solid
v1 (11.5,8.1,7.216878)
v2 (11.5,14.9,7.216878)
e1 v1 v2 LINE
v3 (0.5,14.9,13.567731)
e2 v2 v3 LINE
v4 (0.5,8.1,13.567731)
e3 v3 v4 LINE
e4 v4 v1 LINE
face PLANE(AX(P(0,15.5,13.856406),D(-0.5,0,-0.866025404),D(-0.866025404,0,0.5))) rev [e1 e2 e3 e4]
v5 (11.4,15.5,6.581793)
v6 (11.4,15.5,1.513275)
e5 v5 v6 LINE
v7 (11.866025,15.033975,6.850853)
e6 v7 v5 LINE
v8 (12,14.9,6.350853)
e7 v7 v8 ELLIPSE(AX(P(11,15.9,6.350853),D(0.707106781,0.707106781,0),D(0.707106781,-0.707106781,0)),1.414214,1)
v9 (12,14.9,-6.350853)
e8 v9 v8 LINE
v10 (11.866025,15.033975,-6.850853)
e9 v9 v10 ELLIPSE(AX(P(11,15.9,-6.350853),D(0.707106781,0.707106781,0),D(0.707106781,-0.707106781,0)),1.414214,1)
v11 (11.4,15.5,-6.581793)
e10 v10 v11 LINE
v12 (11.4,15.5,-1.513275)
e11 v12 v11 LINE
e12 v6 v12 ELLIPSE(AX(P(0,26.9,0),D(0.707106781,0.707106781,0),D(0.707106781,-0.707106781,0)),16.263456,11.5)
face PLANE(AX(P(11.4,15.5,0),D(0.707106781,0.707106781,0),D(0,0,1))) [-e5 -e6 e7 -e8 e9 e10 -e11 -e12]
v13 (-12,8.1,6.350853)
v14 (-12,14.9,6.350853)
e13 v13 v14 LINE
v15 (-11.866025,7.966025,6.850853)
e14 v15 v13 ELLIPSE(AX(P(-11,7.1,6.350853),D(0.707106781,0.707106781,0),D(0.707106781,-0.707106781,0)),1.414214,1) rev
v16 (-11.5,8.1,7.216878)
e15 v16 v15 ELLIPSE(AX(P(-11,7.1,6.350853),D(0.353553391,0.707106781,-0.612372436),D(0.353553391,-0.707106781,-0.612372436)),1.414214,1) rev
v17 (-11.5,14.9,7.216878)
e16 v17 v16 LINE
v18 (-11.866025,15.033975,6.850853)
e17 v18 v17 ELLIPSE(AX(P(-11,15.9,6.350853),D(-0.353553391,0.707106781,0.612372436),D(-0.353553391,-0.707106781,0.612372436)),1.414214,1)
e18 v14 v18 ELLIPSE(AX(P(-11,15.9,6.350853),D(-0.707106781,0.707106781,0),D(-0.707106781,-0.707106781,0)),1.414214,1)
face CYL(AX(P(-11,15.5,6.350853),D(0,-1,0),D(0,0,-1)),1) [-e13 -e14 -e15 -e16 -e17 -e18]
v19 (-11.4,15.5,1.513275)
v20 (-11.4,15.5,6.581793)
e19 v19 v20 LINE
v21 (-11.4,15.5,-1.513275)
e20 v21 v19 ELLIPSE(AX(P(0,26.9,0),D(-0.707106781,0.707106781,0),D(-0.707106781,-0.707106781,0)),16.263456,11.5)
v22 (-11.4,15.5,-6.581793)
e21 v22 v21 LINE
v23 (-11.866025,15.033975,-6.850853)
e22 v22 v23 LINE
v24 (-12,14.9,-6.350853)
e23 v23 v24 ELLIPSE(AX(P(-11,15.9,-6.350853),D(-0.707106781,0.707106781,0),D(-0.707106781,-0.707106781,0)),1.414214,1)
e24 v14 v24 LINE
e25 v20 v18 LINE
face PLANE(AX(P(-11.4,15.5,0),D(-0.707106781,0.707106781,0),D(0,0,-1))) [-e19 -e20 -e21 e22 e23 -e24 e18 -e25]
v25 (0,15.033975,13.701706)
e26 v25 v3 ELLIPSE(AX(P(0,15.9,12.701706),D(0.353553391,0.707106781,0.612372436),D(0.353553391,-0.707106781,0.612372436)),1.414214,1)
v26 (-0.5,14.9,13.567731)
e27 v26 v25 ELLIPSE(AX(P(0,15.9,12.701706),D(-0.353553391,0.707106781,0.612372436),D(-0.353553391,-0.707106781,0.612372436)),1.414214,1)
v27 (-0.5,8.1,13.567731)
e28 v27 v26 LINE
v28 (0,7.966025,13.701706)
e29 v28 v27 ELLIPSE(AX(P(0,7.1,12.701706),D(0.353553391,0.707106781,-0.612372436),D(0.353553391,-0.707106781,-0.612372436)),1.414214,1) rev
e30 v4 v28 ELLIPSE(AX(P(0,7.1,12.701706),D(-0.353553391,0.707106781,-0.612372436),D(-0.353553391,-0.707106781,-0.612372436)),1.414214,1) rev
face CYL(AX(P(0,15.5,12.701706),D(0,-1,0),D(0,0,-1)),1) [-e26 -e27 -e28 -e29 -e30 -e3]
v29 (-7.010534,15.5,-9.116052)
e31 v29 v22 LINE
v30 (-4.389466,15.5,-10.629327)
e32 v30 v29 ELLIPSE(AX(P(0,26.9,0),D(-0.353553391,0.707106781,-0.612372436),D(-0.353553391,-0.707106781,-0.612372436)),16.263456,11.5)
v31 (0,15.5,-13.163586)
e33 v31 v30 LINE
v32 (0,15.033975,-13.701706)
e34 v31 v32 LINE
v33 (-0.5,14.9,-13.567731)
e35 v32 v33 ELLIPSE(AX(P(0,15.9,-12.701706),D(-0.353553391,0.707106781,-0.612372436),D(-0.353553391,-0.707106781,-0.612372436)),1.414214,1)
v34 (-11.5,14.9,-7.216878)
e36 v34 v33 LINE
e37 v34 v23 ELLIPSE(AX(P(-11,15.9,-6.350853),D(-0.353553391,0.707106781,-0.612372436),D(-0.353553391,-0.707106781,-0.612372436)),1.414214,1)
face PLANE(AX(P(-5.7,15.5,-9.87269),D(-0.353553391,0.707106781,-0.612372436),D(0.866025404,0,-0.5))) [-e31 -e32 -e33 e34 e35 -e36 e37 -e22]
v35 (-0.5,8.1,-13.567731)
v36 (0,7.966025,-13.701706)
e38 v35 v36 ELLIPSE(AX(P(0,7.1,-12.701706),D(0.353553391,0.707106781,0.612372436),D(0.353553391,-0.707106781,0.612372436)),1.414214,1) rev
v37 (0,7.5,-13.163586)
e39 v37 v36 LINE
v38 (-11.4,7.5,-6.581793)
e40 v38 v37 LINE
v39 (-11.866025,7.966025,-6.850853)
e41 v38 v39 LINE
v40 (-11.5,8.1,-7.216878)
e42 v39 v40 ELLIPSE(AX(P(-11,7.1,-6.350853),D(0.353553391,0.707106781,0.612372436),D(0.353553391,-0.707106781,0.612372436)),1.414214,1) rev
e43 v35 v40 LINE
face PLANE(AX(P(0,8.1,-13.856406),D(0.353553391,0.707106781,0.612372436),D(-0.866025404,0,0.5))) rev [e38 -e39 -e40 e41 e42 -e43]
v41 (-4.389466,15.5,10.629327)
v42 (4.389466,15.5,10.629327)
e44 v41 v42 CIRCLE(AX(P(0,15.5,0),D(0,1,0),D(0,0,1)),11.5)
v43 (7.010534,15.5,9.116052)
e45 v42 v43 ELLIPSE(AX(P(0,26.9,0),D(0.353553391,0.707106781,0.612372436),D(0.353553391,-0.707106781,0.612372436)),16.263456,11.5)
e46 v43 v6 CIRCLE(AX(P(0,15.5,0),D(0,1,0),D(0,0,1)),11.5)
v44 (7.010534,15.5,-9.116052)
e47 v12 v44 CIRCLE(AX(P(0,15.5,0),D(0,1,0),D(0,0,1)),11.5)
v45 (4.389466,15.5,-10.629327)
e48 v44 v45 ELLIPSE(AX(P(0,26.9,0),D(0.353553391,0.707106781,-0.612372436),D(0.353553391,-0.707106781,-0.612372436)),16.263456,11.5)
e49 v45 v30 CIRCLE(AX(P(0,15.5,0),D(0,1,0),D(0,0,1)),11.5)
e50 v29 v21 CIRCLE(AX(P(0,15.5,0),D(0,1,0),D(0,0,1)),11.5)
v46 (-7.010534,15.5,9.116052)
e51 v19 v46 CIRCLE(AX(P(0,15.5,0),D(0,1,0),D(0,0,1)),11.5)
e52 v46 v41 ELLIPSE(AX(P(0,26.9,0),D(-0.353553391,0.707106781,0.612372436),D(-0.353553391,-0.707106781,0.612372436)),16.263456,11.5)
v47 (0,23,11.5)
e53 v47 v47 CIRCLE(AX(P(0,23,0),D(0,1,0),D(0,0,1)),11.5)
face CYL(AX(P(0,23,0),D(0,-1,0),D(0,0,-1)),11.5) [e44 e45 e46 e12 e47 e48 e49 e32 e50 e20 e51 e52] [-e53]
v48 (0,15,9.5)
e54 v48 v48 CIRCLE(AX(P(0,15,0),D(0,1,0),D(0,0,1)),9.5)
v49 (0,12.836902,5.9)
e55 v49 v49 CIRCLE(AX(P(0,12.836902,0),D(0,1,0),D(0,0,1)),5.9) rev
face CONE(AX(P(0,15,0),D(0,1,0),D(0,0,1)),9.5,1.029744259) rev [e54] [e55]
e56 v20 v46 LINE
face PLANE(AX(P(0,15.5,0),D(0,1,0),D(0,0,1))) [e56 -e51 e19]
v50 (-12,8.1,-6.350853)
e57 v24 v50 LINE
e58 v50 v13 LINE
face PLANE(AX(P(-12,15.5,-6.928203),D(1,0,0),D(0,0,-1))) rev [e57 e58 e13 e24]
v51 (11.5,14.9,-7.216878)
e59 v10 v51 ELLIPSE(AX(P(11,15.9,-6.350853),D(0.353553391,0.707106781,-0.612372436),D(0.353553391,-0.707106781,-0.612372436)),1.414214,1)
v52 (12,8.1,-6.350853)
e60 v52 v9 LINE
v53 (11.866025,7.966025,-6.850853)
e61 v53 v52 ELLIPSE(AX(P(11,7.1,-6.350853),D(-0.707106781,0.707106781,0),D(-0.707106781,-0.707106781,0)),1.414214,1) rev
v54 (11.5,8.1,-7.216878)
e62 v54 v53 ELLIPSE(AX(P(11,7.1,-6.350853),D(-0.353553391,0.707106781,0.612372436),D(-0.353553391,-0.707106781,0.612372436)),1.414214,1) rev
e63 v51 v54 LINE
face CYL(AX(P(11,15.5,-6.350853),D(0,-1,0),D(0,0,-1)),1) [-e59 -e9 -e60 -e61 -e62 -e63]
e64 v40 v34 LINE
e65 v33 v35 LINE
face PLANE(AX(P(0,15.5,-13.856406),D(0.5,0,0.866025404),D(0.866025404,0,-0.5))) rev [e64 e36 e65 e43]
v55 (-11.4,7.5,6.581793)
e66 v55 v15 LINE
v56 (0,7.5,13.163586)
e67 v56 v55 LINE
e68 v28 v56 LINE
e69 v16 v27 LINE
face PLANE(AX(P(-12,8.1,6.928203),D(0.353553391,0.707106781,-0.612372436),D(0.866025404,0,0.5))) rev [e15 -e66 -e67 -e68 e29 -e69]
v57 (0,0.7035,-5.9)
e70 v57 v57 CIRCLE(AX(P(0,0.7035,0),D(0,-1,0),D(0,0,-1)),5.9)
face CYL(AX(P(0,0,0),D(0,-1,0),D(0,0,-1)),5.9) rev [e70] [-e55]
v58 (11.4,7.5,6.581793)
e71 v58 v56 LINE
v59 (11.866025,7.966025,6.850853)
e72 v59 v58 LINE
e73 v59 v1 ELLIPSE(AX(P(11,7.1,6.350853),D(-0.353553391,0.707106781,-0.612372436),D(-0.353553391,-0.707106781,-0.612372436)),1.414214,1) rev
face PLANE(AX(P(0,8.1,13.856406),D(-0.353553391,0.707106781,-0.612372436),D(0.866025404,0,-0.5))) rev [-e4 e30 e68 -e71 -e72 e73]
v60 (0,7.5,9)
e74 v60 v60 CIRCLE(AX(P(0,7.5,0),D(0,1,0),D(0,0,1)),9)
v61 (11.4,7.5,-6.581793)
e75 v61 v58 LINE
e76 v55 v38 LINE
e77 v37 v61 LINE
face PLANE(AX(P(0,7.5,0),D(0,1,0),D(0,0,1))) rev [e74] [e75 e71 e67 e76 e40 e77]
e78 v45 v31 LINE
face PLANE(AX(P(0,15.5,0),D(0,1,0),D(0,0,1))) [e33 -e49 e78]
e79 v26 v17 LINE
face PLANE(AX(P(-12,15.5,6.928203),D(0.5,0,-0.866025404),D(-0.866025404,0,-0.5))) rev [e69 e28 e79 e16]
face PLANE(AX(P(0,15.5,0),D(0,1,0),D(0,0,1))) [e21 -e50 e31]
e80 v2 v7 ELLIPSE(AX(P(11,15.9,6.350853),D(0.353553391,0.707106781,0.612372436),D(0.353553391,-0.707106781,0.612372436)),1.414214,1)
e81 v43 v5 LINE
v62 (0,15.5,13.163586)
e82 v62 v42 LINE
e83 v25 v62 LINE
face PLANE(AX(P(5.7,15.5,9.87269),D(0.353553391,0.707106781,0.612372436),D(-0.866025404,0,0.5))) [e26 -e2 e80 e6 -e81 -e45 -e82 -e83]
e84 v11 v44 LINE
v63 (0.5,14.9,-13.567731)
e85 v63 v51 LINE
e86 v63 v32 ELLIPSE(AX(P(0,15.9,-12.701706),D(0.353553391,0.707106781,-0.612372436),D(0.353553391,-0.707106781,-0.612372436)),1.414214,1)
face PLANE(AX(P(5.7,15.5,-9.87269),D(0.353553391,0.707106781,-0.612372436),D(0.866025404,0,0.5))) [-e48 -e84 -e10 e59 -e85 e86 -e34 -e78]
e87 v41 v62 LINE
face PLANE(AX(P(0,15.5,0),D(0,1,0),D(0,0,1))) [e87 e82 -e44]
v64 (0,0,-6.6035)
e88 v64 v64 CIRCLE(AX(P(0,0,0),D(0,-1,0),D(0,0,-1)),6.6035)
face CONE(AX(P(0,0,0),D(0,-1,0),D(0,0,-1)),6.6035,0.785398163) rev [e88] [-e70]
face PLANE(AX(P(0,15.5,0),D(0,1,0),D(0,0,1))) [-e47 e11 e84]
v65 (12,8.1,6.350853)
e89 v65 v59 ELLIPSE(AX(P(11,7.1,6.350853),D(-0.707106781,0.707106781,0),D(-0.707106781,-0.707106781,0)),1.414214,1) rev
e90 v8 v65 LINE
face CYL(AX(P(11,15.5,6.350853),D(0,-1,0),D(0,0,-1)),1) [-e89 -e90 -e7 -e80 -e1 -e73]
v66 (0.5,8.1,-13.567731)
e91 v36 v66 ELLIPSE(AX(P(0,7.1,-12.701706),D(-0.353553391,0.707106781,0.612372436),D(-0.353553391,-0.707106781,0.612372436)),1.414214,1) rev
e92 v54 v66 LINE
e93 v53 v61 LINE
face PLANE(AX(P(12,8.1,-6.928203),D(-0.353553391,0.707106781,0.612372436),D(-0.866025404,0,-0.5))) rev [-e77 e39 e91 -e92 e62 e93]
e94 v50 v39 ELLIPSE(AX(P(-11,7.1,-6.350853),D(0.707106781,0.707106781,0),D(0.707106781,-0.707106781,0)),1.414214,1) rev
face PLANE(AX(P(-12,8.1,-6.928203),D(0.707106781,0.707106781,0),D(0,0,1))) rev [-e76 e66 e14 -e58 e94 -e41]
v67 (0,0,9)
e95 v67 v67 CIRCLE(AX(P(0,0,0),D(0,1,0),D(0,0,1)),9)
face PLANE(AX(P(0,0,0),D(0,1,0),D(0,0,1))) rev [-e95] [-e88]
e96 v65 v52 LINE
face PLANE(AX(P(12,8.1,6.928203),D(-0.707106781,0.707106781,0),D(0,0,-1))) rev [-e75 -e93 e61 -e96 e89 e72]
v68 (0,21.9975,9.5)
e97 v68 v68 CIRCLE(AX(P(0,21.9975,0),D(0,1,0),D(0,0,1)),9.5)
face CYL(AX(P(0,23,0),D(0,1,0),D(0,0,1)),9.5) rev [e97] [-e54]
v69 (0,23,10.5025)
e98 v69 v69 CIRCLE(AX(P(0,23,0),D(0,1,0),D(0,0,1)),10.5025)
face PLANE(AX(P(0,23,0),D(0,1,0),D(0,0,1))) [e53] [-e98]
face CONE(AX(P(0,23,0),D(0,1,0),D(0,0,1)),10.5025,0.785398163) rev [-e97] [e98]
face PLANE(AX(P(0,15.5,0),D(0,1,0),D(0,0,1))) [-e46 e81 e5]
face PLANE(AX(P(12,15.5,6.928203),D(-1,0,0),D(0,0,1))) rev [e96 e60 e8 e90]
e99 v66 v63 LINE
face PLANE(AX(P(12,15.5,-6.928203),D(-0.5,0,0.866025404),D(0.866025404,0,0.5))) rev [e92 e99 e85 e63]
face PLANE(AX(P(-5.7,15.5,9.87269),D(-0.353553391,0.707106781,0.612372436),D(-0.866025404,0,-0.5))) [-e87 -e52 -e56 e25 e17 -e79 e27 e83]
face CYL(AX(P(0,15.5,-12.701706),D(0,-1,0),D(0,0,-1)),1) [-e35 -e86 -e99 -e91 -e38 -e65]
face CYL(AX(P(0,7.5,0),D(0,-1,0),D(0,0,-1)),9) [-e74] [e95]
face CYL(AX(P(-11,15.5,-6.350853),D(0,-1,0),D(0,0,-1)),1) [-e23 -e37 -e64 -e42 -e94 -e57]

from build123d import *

# Parameters (mm, degrees)
SKETCH_1_R                    = 9
EXTRUDE_1_DEPTH               = 7.5
EXTRUDE_2_DEPTH               = 8
SKETCH_3_R                    = 11.5
EXTRUDE_3_DEPTH               = 7.5
CHAMFER_2_SIZE                = 0.6
FILLET_1_R                    = 1
HOLE_WIZARD_G1_22_D           = 19
HOLE_WIZARD_G1_22_DEPTH       = 8
HOLE_WIZARD_G1_22_CSINK_D     = 21.005
HOLE_WIZARD_G1_22_CSINK_ANGLE = 90
HOLE_WIZARD_G1_22_TIP         = 5.708175880761822
HOLE_WIZARD_G1_41_D           = 11.8
HOLE_WIZARD_G1_41_DEPTH       = 30.32
HOLE_WIZARD_G1_41_CSINK_D     = 13.207
HOLE_WIZARD_G1_41_CSINK_ANGLE = 90
HOLE_WIZARD_G1_41_TIP         = 3.5450776522626057


with BuildPart() as part:
    # Эскиз1 → Бобышка-Вытянуть1 (new body)
    with BuildSketch(Plane(origin=(0, 0, 0), x_dir=(1, 0, 0), z_dir=(0, 1, 0))):
        with Locations(Location((0, 0, 0), (0, 0, 270))):
            Circle(SKETCH_1_R)
    extrude(amount=EXTRUDE_1_DEPTH)

    # Эскиз2 → Бобышка-Вытянуть2 (add)
    with BuildSketch(Plane(origin=(0, 7.5, 0), x_dir=(1, 0, 0), z_dir=(0, 1, 0))):
        Polygon((-3.47e-15, 13.856406460551018), (-12, 6.92820323027551), (-11.999999999999996, -6.9282032302755105), (1.63e-15, -13.856406460551016), (12, -6.928203230275508), (11.999999999999993, 6.928203230275516), align=None)
    extrude(amount=EXTRUDE_2_DEPTH)

    # Эскиз3 → Бобышка-Вытянуть3 (add)
    with BuildSketch(Plane(origin=(0, 15.5, 0), x_dir=(1, 0, 0), z_dir=(0, 1, 0))):
        with Locations(Location((0, 0, 0), (0, 0, 270))):
            Circle(SKETCH_3_R)
    extrude(amount=EXTRUDE_3_DEPTH)

    # Фаска2
    # the kernel refuses this chamfer: 0.6 mm, written as the material it takes off along each edge
    with BuildSketch(Plane(origin=(13.336285678835246, 7.5, -6.156698333885741), x_dir=(0.01374793830529287, 0.9996219169112968, -0.023812127644089635), z_dir=(-0.8660254037844389, 0, -0.4999999999999997))) as chamfer_2_piece_1:
        Polygon((CHAMFER_2_SIZE * 0.999621916911, -CHAMFER_2_SIZE * 0.0274958766106), (-CHAMFER_2_SIZE * 0.0274958766106, -CHAMFER_2_SIZE * 0.999621916911), (0, 0), align=None)
    extrude(amount=16.942426046110114, mode=Mode.SUBTRACT)
    with BuildSketch(Plane(origin=(1.3362856788352484, 7.5, -14.627911356940793), x_dir=(-0.013747938305293587, 0.9996219169112968, -0.023812127644090856), z_dir=(-0.8660254037844387, 0, 0.5000000000000001))) as chamfer_2_piece_2:
        Polygon((CHAMFER_2_SIZE * 0.999621916911, -CHAMFER_2_SIZE * 0.0274958766106), (-CHAMFER_2_SIZE * 0.0274958766106, -CHAMFER_2_SIZE * 0.999621916911), (0, 0), align=None)
    extrude(amount=16.942426046110114, mode=Mode.SUBTRACT)
    with BuildSketch(Plane(origin=(-12, 7.5, -8.471213023055057), x_dir=(-0.027495876610587344, 0.9996219169112968, 0), z_dir=(2.6e-16, 0, 1))) as chamfer_2_piece_3:
        Polygon((CHAMFER_2_SIZE * 0.999621916911, -CHAMFER_2_SIZE * 0.0274958766106), (-CHAMFER_2_SIZE * 0.0274958766106, -CHAMFER_2_SIZE * 0.999621916911), (0, 0), align=None)
    extrude(amount=16.942426046110118, mode=Mode.SUBTRACT)
    with BuildSketch(Plane(origin=(-13.33628567883525, 7.5, 6.1566983338857355), x_dir=(0.4998109584556482, -0.027495876610585928, -0.8656979742248805), z_dir=(0.8660254037844387, 0, 0.49999999999999983))) as chamfer_2_piece_4:
        Polygon((CHAMFER_2_SIZE * 0.999621916911, CHAMFER_2_SIZE * 0.0274958766106), (-CHAMFER_2_SIZE * 0.0274958766106, CHAMFER_2_SIZE * 0.999621916911), (0, 0), align=None)
    extrude(amount=16.942426046110118, mode=Mode.SUBTRACT)
    with BuildSketch(Plane(origin=(-1.3362856788352513, 7.5, 14.62791135694079), x_dir=(-0.49981095845564827, -0.027495876610585855, -0.8656979742248804), z_dir=(0.8660254037844387, 0, -0.5))) as chamfer_2_piece_5:
        Polygon((CHAMFER_2_SIZE * 0.999621916911, CHAMFER_2_SIZE * 0.0274958766106), (-CHAMFER_2_SIZE * 0.0274958766106, CHAMFER_2_SIZE * 0.999621916911), (0, 0), align=None)
    extrude(amount=16.942426046110114, mode=Mode.SUBTRACT)
    with BuildSketch(Plane(origin=(12, 7.5, 8.471213023055055), x_dir=(-0.9996219169112968, -0.027495876610585904, 0), z_dir=(-5.1e-16, 0, -1))) as chamfer_2_piece_6:
        Polygon((CHAMFER_2_SIZE * 0.999621916911, CHAMFER_2_SIZE * 0.0274958766106), (-CHAMFER_2_SIZE * 0.0274958766106, CHAMFER_2_SIZE * 0.999621916911), (0, 0), align=None)
    extrude(amount=16.94242604611012, mode=Mode.SUBTRACT)
    with BuildSketch(Plane(origin=(13.336285678835246, 15.5, -6.156698333885741), x_dir=(0.01374793830529287, -0.9996219169112968, -0.023812127644089635), z_dir=(-0.8660254037844389, 0, -0.4999999999999997))) as chamfer_2_piece_7_section:
        Polygon((CHAMFER_2_SIZE * 0.999621916911, CHAMFER_2_SIZE * 0.0274958766106), (-CHAMFER_2_SIZE * 0.0274958766106, CHAMFER_2_SIZE * 0.999621916911), (0, 0), align=None)
    chamfer_2_piece_7 = extrude(amount=16.942426046110114, mode=Mode.PRIVATE)
    chamfer_2_piece_7 = chamfer_2_piece_7 - Plane(origin=(0, 15.301333740559118, 0), x_dir=(-1.8e-16, 0, 1), z_dir=(0, -1, 0)) * Cylinder(11.5, 37, mode=Mode.PRIVATE)
    add(chamfer_2_piece_7, mode=Mode.SUBTRACT)
    with BuildSketch(Plane(origin=(1.3362856788352486, 15.5, -14.627911356940793), x_dir=(-0.013747938305293677, -0.9996219169112968, -0.02381212764409101), z_dir=(-0.8660254037844387, 0, 0.5000000000000001))) as chamfer_2_piece_8_section:
        Polygon((CHAMFER_2_SIZE * 0.999621916911, CHAMFER_2_SIZE * 0.0274958766106), (-CHAMFER_2_SIZE * 0.0274958766106, CHAMFER_2_SIZE * 0.999621916911), (0, 0), align=None)
    chamfer_2_piece_8 = extrude(amount=16.942426046110118, mode=Mode.PRIVATE)
    chamfer_2_piece_8 = chamfer_2_piece_8 - Plane(origin=(0, 15.30133374055918, 0), x_dir=(-1.8e-16, 0, 1), z_dir=(0, -1, 0)) * Cylinder(11.5, 37, mode=Mode.PRIVATE)
    add(chamfer_2_piece_8, mode=Mode.SUBTRACT)
    with BuildSketch(Plane(origin=(-12, 15.5, -8.471213023055057), x_dir=(-0.027495876610587344, -0.9996219169112968, 0), z_dir=(2.6e-16, 0, 1))) as chamfer_2_piece_9_section:
        Polygon((CHAMFER_2_SIZE * 0.999621916911, CHAMFER_2_SIZE * 0.0274958766106), (-CHAMFER_2_SIZE * 0.0274958766106, CHAMFER_2_SIZE * 0.999621916911), (0, 0), align=None)
    chamfer_2_piece_9 = extrude(amount=16.942426046110118, mode=Mode.PRIVATE)
    chamfer_2_piece_9 = chamfer_2_piece_9 - Plane(origin=(0, 15.301333740559167, 0), x_dir=(-1.8e-16, 0, 1), z_dir=(0, -1, 0)) * Cylinder(11.5, 37, mode=Mode.PRIVATE)
    add(chamfer_2_piece_9, mode=Mode.SUBTRACT)
    with BuildSketch(Plane(origin=(-13.33628567883525, 15.5, 6.1566983338857355), x_dir=(0.4998109584556481, 0.02749587661058736, -0.8656979742248804), z_dir=(0.8660254037844387, 0, 0.49999999999999983))) as chamfer_2_piece_10_section:
        Polygon((CHAMFER_2_SIZE * 0.999621916911, -CHAMFER_2_SIZE * 0.0274958766106), (-CHAMFER_2_SIZE * 0.0274958766106, -CHAMFER_2_SIZE * 0.999621916911), (0, 0), align=None)
    chamfer_2_piece_10 = extrude(amount=16.942426046110118, mode=Mode.PRIVATE)
    chamfer_2_piece_10 = chamfer_2_piece_10 - Plane(origin=(0, 15.301333740442608, 0), x_dir=(-1.8e-16, 0, 1), z_dir=(0, -1, 0)) * Cylinder(11.5, 37, mode=Mode.PRIVATE)
    add(chamfer_2_piece_10, mode=Mode.SUBTRACT)
    with BuildSketch(Plane(origin=(-1.336285678835251, 15.5, 14.62791135694079), x_dir=(-0.49981095845564827, 0.02749587661058729, -0.8656979742248804), z_dir=(0.8660254037844387, 0, -0.5))) as chamfer_2_piece_11_section:
        Polygon((CHAMFER_2_SIZE * 0.999621916911, -CHAMFER_2_SIZE * 0.0274958766106), (-CHAMFER_2_SIZE * 0.0274958766106, -CHAMFER_2_SIZE * 0.999621916911), (0, 0), align=None)
    chamfer_2_piece_11 = extrude(amount=16.94242604611012, mode=Mode.PRIVATE)
    chamfer_2_piece_11 = chamfer_2_piece_11 - Plane(origin=(0, 15.301333740442338, 0), x_dir=(-1.8e-16, 0, 1), z_dir=(0, -1, 0)) * Cylinder(11.5, 37, mode=Mode.PRIVATE)
    add(chamfer_2_piece_11, mode=Mode.SUBTRACT)
    with BuildSketch(Plane(origin=(12, 15.5, 8.471213023055055), x_dir=(-0.9996219169112968, 0.027495876610587344, 0), z_dir=(-5.1e-16, 0, -1))) as chamfer_2_piece_12_section:
        Polygon((CHAMFER_2_SIZE * 0.999621916911, -CHAMFER_2_SIZE * 0.0274958766106), (-CHAMFER_2_SIZE * 0.0274958766106, -CHAMFER_2_SIZE * 0.999621916911), (0, 0), align=None)
    chamfer_2_piece_12 = extrude(amount=16.94242604611012, mode=Mode.PRIVATE)
    chamfer_2_piece_12 = chamfer_2_piece_12 - Plane(origin=(0, 15.301333740442368, 0), x_dir=(-1.8e-16, 0, 1), z_dir=(0, -1, 0)) * Cylinder(11.5, 37, mode=Mode.PRIVATE)
    add(chamfer_2_piece_12, mode=Mode.SUBTRACT)

    # Скругление1
    fillet_1_edges = [part.edges().sort_by_distance(p)[0] for p in [
        (-3.47e-15, 11.5, -13.856406460551018),
        (11.999999999999993, 11.5, -6.928203230275516),
        (12, 11.5, 6.928203230275508),
        (1.63e-15, 11.5, 13.856406460551016),
        (-11.999999999999996, 11.5, 6.9282032302755105),
        (-12, 11.5, -6.92820323027551),
    ]]
    fillet(fillet_1_edges, radius=FILLET_1_R)

    # Отверстие обработанное метчиком G1/22
    with Locations(Plane(origin=(0, 23, 0), x_dir=(1, 0, 0), z_dir=(0, 1, 0))):
        with Locations((0, 0)):
            CounterSinkHole(HOLE_WIZARD_G1_22_D / 2, HOLE_WIZARD_G1_22_CSINK_D / 2, depth=HOLE_WIZARD_G1_22_DEPTH, counter_sink_angle=HOLE_WIZARD_G1_22_CSINK_ANGLE)
            with Locations((0, 0, -(HOLE_WIZARD_G1_22_DEPTH + HOLE_WIZARD_G1_22_TIP / 2))):  # 118° drill point
                Cone(0, HOLE_WIZARD_G1_22_D / 2, HOLE_WIZARD_G1_22_TIP, mode=Mode.SUBTRACT)

    # Отверстие обработанное метчиком G1/41
    with Locations(Plane(origin=(0, 0, 0), x_dir=(-1, 0, 0), z_dir=(0, -1, 0))):
        with Locations((0, 0)):
            CounterSinkHole(HOLE_WIZARD_G1_41_D / 2, HOLE_WIZARD_G1_41_CSINK_D / 2, depth=HOLE_WIZARD_G1_41_DEPTH, counter_sink_angle=HOLE_WIZARD_G1_41_CSINK_ANGLE)
            with Locations((0, 0, -(HOLE_WIZARD_G1_41_DEPTH + HOLE_WIZARD_G1_41_TIP / 2))):  # 118° drill point
                Cone(0, HOLE_WIZARD_G1_41_D / 2, HOLE_WIZARD_G1_41_TIP, mode=Mode.SUBTRACT)


solid = part.part
